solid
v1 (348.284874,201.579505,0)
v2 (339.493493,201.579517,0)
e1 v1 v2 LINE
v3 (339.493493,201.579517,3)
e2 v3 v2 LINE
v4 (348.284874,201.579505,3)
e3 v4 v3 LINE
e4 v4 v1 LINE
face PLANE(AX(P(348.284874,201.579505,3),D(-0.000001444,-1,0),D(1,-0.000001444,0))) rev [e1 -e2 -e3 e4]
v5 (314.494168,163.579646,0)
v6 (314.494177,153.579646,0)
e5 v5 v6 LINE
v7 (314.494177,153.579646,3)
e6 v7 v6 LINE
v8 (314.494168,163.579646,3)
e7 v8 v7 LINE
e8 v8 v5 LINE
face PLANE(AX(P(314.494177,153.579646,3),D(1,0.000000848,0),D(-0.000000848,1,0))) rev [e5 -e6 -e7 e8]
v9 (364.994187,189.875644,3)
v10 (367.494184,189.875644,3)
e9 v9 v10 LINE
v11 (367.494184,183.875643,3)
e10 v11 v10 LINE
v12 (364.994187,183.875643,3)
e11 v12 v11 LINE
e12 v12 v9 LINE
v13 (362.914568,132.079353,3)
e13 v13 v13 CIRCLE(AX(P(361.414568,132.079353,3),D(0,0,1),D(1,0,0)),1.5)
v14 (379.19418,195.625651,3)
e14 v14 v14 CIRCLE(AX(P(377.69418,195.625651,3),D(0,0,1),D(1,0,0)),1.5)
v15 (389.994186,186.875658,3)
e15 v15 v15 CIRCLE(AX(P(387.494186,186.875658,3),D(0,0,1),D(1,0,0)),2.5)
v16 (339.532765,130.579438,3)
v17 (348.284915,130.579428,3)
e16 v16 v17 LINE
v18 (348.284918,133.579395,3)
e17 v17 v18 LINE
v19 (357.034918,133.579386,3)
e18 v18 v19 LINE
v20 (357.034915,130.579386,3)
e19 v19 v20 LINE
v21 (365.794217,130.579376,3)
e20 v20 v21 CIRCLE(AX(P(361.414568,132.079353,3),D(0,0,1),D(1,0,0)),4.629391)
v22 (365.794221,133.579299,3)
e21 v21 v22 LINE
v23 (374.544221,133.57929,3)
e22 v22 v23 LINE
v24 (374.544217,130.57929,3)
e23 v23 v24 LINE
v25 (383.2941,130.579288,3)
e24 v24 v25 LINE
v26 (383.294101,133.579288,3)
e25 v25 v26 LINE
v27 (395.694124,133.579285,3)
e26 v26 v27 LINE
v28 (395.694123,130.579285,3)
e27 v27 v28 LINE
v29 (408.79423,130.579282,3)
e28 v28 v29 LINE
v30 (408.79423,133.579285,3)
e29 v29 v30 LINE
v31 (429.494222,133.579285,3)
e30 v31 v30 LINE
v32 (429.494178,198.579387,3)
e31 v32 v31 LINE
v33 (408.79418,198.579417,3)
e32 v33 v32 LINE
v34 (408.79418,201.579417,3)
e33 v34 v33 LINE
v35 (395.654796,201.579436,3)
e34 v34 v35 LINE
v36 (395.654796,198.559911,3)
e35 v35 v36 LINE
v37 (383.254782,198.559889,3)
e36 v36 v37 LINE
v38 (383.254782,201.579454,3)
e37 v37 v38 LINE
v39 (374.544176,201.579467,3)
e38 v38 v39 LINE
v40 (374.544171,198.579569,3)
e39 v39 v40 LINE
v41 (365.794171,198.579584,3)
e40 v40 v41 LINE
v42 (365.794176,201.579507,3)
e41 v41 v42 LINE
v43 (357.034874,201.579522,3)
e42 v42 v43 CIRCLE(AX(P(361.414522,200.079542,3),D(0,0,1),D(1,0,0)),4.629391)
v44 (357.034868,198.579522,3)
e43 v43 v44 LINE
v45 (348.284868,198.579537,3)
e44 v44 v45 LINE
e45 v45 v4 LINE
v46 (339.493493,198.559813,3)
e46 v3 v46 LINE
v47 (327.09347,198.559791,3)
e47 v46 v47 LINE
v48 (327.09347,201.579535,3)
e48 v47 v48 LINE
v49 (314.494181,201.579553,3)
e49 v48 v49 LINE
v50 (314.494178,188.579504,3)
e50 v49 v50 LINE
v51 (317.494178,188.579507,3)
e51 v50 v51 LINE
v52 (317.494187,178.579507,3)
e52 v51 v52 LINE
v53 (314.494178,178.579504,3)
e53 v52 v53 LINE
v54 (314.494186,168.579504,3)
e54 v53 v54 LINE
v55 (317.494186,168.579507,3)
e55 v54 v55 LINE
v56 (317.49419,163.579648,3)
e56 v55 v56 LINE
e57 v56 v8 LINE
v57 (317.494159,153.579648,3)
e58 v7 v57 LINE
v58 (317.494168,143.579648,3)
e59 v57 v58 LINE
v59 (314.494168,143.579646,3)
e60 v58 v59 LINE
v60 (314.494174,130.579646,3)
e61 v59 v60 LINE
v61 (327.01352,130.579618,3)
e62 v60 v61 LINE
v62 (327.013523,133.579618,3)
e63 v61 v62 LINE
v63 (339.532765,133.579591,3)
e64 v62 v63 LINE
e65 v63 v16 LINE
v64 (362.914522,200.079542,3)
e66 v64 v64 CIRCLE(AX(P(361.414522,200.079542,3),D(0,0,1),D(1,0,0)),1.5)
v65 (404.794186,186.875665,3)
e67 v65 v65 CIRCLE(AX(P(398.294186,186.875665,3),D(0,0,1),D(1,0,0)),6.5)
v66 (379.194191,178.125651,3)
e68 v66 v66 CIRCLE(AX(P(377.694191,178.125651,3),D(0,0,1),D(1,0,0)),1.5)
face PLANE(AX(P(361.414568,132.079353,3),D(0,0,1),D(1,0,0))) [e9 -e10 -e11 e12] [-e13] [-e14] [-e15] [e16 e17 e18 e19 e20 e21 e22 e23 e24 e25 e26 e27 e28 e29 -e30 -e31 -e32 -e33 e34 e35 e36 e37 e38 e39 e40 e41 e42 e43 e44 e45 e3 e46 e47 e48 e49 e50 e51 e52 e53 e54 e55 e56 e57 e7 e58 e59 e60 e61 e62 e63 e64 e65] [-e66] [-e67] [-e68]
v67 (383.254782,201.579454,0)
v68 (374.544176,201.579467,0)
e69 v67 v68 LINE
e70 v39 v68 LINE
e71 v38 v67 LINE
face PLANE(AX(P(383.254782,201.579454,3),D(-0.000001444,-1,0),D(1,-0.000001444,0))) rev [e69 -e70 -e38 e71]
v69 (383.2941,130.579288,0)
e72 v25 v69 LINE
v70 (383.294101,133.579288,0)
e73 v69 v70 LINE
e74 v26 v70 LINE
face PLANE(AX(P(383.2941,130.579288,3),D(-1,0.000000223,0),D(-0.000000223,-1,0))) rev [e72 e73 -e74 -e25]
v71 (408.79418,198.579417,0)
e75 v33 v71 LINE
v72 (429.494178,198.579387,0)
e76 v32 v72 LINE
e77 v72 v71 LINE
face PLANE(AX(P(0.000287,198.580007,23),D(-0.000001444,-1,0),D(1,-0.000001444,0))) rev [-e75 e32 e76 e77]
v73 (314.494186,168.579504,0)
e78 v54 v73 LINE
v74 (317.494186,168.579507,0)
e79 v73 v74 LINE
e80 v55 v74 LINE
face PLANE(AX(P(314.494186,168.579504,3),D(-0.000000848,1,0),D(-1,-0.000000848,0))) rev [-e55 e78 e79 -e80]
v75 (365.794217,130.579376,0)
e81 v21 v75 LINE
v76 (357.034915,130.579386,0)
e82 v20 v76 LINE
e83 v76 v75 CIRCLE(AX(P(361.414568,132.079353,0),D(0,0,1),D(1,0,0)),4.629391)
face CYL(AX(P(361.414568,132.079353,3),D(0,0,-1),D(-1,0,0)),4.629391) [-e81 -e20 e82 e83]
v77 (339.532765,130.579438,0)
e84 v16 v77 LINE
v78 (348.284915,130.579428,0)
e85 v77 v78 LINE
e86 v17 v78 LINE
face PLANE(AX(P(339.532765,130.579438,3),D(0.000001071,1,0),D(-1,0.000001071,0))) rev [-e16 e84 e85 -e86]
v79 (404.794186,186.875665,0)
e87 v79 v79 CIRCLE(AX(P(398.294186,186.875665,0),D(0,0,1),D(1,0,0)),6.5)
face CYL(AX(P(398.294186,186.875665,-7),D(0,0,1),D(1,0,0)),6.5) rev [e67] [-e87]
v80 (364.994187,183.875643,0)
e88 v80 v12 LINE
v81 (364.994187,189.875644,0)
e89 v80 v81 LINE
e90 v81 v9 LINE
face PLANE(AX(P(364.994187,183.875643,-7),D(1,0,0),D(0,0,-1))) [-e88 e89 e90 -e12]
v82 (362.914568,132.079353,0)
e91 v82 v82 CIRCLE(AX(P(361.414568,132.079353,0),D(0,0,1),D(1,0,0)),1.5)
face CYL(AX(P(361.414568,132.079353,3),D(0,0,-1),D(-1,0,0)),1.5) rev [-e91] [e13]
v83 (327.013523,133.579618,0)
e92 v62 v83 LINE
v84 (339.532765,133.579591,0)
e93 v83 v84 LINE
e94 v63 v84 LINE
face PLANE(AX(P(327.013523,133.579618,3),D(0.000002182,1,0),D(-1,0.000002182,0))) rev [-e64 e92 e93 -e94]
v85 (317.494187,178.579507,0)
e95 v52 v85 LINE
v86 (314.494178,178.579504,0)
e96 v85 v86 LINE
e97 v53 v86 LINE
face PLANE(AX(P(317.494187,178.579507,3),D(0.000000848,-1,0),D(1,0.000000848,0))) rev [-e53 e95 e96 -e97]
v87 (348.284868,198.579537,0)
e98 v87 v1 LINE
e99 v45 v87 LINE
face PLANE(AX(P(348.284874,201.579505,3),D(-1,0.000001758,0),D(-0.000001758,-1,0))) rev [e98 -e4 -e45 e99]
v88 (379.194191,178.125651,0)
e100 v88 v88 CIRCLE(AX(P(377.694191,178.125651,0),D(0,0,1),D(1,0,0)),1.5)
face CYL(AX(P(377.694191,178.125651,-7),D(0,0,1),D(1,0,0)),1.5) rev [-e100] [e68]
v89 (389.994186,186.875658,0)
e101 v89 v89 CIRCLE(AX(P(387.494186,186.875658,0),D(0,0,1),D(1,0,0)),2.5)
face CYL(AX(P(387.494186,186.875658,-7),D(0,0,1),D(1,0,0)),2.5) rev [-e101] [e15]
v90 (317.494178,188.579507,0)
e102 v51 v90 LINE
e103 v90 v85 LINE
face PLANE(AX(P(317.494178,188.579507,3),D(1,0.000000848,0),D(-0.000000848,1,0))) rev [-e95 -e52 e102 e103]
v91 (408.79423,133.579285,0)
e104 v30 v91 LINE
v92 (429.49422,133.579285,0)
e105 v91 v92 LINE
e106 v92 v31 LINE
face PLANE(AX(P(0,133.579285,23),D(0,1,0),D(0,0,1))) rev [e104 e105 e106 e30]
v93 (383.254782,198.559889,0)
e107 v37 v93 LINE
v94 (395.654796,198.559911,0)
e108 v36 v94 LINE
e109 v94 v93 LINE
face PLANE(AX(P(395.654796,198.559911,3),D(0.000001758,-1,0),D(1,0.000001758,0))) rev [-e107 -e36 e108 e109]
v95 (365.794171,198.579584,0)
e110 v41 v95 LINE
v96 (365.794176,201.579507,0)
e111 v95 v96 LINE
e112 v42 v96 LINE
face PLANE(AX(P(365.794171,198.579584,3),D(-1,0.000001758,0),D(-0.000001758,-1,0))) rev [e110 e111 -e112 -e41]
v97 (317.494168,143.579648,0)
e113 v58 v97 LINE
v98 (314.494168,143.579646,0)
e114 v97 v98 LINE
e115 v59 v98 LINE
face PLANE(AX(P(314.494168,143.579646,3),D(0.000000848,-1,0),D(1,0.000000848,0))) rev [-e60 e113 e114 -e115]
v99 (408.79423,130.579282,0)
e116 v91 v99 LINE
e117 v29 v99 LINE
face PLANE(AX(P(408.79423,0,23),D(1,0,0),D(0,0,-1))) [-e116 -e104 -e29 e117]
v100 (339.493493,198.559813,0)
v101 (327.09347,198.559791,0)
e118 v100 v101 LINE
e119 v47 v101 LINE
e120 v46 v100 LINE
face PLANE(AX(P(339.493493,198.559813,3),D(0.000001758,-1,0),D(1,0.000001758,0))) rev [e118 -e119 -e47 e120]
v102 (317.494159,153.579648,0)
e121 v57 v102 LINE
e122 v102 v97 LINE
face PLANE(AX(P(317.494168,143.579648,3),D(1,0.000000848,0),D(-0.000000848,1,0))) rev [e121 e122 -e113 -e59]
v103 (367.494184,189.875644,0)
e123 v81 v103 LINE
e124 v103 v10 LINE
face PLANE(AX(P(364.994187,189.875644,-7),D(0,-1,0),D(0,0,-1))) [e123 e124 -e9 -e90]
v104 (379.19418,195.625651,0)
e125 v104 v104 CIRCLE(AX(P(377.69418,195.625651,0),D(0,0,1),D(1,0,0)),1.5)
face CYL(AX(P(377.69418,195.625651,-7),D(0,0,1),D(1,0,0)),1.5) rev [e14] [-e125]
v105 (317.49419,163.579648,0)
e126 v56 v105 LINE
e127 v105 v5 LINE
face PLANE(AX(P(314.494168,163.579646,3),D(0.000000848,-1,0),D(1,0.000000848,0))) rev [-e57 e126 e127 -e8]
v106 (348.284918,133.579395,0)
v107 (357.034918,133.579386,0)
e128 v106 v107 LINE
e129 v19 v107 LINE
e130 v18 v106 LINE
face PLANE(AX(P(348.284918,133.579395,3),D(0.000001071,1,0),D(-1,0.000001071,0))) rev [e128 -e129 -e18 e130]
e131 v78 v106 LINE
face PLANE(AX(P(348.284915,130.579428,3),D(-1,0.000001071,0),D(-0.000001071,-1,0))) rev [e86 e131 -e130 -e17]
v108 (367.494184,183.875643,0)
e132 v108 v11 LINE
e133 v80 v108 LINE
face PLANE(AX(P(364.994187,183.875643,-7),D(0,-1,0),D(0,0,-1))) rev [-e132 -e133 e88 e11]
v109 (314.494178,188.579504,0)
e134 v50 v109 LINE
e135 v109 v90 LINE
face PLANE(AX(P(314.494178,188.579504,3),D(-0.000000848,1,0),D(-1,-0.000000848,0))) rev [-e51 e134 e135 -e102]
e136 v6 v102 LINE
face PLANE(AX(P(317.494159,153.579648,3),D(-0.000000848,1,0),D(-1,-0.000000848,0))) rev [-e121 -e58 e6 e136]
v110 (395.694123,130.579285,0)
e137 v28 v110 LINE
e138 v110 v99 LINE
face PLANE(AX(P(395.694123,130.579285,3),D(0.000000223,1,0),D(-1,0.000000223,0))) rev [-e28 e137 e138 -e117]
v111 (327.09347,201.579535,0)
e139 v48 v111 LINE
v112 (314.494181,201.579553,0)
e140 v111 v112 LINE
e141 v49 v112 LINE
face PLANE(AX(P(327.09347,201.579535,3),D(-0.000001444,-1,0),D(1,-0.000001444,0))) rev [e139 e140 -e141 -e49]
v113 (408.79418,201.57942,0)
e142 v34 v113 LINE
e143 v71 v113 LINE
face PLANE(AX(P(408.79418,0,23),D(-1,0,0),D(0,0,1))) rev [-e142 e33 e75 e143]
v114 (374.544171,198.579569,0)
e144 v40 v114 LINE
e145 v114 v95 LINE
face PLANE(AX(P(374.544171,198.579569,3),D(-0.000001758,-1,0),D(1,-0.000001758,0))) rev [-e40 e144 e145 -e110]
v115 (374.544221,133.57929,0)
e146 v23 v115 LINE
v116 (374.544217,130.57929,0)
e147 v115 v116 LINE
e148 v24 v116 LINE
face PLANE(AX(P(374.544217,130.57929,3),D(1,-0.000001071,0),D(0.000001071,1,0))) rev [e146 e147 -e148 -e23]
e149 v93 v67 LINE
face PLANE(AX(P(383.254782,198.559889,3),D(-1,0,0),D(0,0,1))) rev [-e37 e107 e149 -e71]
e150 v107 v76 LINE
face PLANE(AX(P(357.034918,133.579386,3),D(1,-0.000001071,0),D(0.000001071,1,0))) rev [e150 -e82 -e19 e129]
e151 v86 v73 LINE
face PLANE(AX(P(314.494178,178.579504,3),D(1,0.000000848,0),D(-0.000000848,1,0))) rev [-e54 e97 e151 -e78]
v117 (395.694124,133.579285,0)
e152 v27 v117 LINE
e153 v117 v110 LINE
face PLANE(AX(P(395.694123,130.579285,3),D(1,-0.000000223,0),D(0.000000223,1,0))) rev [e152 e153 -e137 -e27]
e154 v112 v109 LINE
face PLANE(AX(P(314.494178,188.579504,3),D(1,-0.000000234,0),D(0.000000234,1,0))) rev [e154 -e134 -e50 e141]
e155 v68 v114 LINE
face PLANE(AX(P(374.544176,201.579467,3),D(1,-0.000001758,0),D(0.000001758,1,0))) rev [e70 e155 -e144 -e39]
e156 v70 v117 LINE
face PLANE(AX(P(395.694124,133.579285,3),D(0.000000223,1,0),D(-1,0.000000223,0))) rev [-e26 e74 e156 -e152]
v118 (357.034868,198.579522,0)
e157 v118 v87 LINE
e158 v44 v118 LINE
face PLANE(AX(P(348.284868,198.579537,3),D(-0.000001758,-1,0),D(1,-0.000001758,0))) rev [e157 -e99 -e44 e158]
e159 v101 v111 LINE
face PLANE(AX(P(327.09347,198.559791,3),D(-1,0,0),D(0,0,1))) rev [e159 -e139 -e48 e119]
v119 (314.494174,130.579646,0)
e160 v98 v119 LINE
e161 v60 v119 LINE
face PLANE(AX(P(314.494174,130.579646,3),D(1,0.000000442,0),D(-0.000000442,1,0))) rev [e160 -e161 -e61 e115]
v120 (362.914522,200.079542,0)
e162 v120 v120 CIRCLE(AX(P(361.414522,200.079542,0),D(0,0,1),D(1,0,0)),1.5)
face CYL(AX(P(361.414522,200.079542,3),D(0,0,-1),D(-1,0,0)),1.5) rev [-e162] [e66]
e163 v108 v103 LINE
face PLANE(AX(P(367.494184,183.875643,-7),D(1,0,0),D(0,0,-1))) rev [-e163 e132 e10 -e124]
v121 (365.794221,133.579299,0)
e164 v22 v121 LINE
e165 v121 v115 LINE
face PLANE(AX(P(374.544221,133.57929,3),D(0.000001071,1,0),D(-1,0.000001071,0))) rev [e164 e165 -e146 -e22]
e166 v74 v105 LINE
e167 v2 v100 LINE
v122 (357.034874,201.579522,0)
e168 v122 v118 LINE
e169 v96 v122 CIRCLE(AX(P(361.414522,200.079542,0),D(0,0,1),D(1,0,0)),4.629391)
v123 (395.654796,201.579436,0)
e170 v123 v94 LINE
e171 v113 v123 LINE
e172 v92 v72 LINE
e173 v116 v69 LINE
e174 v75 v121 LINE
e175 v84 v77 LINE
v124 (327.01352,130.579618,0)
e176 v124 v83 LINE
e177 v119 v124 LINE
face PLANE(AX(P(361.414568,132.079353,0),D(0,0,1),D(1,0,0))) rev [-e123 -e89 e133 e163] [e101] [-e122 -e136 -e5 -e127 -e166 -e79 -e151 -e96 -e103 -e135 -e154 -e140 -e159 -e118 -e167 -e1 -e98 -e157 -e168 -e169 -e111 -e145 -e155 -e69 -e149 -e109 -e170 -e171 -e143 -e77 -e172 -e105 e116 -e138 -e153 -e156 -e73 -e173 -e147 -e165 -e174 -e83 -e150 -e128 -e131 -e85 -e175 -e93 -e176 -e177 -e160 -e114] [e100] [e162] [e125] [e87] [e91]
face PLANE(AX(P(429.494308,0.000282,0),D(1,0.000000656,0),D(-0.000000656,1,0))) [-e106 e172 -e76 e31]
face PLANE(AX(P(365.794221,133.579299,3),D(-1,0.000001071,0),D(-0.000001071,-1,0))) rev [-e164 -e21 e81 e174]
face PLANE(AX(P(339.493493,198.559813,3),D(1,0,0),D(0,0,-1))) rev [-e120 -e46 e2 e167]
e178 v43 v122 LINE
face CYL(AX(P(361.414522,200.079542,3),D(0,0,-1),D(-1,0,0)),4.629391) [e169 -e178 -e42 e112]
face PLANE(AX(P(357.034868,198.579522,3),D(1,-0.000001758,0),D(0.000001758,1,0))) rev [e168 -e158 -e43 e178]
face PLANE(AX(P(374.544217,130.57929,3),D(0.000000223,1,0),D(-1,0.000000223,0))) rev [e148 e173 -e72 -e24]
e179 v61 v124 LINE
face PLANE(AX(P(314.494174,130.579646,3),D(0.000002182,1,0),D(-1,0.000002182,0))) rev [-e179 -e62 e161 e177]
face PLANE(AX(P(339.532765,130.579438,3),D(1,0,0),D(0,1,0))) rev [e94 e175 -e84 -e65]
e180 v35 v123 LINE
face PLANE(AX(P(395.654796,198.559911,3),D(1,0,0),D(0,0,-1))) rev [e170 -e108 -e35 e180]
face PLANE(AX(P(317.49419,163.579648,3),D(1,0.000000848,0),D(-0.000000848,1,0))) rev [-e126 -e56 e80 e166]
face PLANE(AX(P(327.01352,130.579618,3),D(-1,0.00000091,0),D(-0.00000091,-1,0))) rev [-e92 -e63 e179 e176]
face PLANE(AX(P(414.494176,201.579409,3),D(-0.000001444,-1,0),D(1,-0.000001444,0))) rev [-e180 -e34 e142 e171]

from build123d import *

# Parameters (mm, degrees)
CROQUIS1_R              = 1.500000001
SALIENTE_EXTRUIR1_DEPTH = 3
CROQUIS4_W              = 3
CROQUIS4_H              = 71.0001277
SALIENTE_EXTRUIR2_DEPTH = 15
CROQUIS5_R              = 6.5
CROQUIS5_R_2            = 1.5
CROQUIS5_R_3            = 2.5
CROQUIS5_W              = 2.499996062
CROQUIS5_H              = 6.000001641
CORTAR_EXTRUIR1_DEPTH   = 10
CORTAR_EXTRUIR3_START   = -3
CORTAR_EXTRUIR3_DEPTH   = 3


# Read off the part's stored shape, not the designer's step: Cortar-Extruir3
with BuildPart() as part:
    # Croquis1 → Saliente-Extruir1 (new body)
    with BuildSketch(Plane.XY):
        with BuildLine():
            Line((314.494178041, 188.579504075), (317.494178043, 188.579506619))
            Line((317.494178043, 188.579506619), (317.494186524, 178.579506615))
            Line((317.494186524, 178.579506615), (314.494177731, 178.579504071))
            Line((314.494177731, 178.579504071), (314.494186212, 168.579504067))
            Line((314.494186212, 168.579504067), (317.494186214, 168.579506611))
            Line((317.494186214, 168.579506611), (317.494190454, 163.579648323))
            Line((317.494190454, 163.579648323), (314.494168474, 163.579645778))
            Line((314.494168474, 163.579645778), (314.494176956, 153.579645774))
            Line((314.494176956, 153.579645774), (317.494159374, 153.579648318))
            Line((317.494159374, 153.579648318), (317.494167855, 143.579648314))
            Line((317.494167855, 143.579648314), (314.494167854, 143.57964577))
            Line((314.494167854, 143.57964577), (314.494173605, 130.579645765))
            Line((314.494173605, 130.579645765), (327.013519861, 130.579618443))
            Line((327.013519861, 130.579618443), (327.013522591, 133.579618444))
            Line((327.013522591, 133.579618444), (339.532765197, 133.579591123))
            Line((339.532765197, 133.579591123), (339.532765197, 130.57943755))
            Line((339.532765197, 130.57943755), (348.284914925, 130.579428178))
            Line((348.284914925, 130.579428178), (348.284918137, 133.579395242))
            Line((348.284918137, 133.579395242), (357.034918141, 133.579385871))
            Line((357.034918141, 133.579385871), (357.034914928, 130.57938587))
            ThreePointArc((357.034914928, 130.57938587), (361.414562849, 127.449962294), (365.794217472, 130.57937649))
            Line((365.794217472, 130.57937649), (365.794220685, 133.579299126))
            Line((365.794220685, 133.579299126), (374.544220688, 133.579289756))
            Line((374.544220688, 133.579289756), (374.544217476, 130.579290106))
            Line((374.544217476, 130.579290106), (383.294100119, 130.579288157))
            Line((383.294100119, 130.579288157), (383.294100787, 133.579288158))
            Line((383.294100787, 133.579288158), (395.694123645, 133.579285396))
            Line((395.694123645, 133.579285396), (395.694122977, 130.579285394))
            Line((395.694122977, 130.579285394), (414.49422245, 130.579281206))
            Line((414.49422245, 130.579281206), (414.494175849, 201.579408906))
            Line((414.494175849, 201.579408906), (395.654796079, 201.579436111))
            Line((395.654796079, 201.579436111), (395.654796079, 198.559911251))
            Line((395.654796079, 198.559911251), (383.254781657, 198.559889448))
            Line((383.254781657, 198.559889448), (383.254781657, 201.579454018))
            Line((383.254781657, 201.579454018), (374.544176149, 201.579466597))
            Line((374.544176149, 201.579466597), (374.544170874, 198.579568646))
            Line((374.544170874, 198.579568646), (365.794170871, 198.579584031))
            Line((365.794170871, 198.579584031), (365.794176145, 201.579506668))
            ThreePointArc((365.794176145, 201.579506668), (361.414530376, 204.708933254), (357.034873601, 201.579522069))
            Line((357.034873601, 201.579522069), (357.034868326, 198.579522068))
            Line((357.034868326, 198.579522068), (348.284868323, 198.579537453))
            Line((348.284868323, 198.579537453), (348.284873598, 201.579504517))
            Line((348.284873598, 201.579504517), (339.493492813, 201.579517212))
            Line((339.493492813, 201.579517212), (339.493492813, 198.559812504))
            Line((339.493492813, 198.559812504), (327.093469951, 198.559790701))
            Line((327.093469951, 198.559790701), (327.093469951, 201.579535118))
            Line((327.093469951, 201.579535118), (314.494181082, 201.579553313))
            Line((314.494181082, 201.579553313), (314.494178041, 188.579504075))
        make_face()
        with Locations((361.414522236, 200.079542161)):
            Circle(CROQUIS1_R, mode=Mode.SUBTRACT)
        with Locations((361.414567806, 132.079353387)):
            Circle(CROQUIS1_R, mode=Mode.SUBTRACT)
    extrude(amount=SALIENTE_EXTRUIR1_DEPTH)

    # Croquis4 → Saliente-Extruir2 (add)
    with BuildSketch(Plane(origin=(414.494308155, 0.000272052, 0), x_dir=(0, 0, -1), z_dir=(0.9999999999997846, 6.563478556519826e-07, 0))):
        with Locations((-1.5, 166.079073004)):
            Rectangle(CROQUIS4_W, CROQUIS4_H)
    extrude(amount=SALIENTE_EXTRUIR2_DEPTH)

    # Croquis5 → Cortar-Extruir1 (cut)
    with BuildSketch(Plane.XY.offset(3)):
        with Locations((398.2941855, 186.875664671)):
            Circle(CROQUIS5_R)
        with Locations((377.694191243, 178.12565115)):
            Circle(CROQUIS5_R_2)
        with Locations((377.694179757, 195.62565115)):
            Circle(CROQUIS5_R_2)
        with Locations((387.4941855, 186.875657583)):
            Circle(CROQUIS5_R_3)
        with Locations((366.2441855, 186.875643636)):
            Rectangle(CROQUIS5_W, CROQUIS5_H)
    extrude(amount=-CORTAR_EXTRUIR1_DEPTH, mode=Mode.SUBTRACT)

    # Cortar-Extruir3 outline → Cortar-Extruir3 (cut)
    with BuildSketch(Plane(origin=(0, 0, 0), x_dir=(-1, 0, 0), z_dir=(0, 0, -1)).offset(CORTAR_EXTRUIR3_START)):
        Polygon((-429.494177993, 198.579387245), (-408.794180476, 198.579417137), (-408.794180476, 201.579419823), (-414.494175849, 201.579408906), (-429.494175849, 201.579418751), align=None)
        Polygon((-408.794229793, 133.579285396), (-429.49422245, 133.579285396), (-429.49422245, 130.579291051), (-414.49422245, 130.579281206), (-408.794229793, 130.579282476), align=None)
    extrude(amount=CORTAR_EXTRUIR3_DEPTH, mode=Mode.SUBTRACT)


solid = part.part
